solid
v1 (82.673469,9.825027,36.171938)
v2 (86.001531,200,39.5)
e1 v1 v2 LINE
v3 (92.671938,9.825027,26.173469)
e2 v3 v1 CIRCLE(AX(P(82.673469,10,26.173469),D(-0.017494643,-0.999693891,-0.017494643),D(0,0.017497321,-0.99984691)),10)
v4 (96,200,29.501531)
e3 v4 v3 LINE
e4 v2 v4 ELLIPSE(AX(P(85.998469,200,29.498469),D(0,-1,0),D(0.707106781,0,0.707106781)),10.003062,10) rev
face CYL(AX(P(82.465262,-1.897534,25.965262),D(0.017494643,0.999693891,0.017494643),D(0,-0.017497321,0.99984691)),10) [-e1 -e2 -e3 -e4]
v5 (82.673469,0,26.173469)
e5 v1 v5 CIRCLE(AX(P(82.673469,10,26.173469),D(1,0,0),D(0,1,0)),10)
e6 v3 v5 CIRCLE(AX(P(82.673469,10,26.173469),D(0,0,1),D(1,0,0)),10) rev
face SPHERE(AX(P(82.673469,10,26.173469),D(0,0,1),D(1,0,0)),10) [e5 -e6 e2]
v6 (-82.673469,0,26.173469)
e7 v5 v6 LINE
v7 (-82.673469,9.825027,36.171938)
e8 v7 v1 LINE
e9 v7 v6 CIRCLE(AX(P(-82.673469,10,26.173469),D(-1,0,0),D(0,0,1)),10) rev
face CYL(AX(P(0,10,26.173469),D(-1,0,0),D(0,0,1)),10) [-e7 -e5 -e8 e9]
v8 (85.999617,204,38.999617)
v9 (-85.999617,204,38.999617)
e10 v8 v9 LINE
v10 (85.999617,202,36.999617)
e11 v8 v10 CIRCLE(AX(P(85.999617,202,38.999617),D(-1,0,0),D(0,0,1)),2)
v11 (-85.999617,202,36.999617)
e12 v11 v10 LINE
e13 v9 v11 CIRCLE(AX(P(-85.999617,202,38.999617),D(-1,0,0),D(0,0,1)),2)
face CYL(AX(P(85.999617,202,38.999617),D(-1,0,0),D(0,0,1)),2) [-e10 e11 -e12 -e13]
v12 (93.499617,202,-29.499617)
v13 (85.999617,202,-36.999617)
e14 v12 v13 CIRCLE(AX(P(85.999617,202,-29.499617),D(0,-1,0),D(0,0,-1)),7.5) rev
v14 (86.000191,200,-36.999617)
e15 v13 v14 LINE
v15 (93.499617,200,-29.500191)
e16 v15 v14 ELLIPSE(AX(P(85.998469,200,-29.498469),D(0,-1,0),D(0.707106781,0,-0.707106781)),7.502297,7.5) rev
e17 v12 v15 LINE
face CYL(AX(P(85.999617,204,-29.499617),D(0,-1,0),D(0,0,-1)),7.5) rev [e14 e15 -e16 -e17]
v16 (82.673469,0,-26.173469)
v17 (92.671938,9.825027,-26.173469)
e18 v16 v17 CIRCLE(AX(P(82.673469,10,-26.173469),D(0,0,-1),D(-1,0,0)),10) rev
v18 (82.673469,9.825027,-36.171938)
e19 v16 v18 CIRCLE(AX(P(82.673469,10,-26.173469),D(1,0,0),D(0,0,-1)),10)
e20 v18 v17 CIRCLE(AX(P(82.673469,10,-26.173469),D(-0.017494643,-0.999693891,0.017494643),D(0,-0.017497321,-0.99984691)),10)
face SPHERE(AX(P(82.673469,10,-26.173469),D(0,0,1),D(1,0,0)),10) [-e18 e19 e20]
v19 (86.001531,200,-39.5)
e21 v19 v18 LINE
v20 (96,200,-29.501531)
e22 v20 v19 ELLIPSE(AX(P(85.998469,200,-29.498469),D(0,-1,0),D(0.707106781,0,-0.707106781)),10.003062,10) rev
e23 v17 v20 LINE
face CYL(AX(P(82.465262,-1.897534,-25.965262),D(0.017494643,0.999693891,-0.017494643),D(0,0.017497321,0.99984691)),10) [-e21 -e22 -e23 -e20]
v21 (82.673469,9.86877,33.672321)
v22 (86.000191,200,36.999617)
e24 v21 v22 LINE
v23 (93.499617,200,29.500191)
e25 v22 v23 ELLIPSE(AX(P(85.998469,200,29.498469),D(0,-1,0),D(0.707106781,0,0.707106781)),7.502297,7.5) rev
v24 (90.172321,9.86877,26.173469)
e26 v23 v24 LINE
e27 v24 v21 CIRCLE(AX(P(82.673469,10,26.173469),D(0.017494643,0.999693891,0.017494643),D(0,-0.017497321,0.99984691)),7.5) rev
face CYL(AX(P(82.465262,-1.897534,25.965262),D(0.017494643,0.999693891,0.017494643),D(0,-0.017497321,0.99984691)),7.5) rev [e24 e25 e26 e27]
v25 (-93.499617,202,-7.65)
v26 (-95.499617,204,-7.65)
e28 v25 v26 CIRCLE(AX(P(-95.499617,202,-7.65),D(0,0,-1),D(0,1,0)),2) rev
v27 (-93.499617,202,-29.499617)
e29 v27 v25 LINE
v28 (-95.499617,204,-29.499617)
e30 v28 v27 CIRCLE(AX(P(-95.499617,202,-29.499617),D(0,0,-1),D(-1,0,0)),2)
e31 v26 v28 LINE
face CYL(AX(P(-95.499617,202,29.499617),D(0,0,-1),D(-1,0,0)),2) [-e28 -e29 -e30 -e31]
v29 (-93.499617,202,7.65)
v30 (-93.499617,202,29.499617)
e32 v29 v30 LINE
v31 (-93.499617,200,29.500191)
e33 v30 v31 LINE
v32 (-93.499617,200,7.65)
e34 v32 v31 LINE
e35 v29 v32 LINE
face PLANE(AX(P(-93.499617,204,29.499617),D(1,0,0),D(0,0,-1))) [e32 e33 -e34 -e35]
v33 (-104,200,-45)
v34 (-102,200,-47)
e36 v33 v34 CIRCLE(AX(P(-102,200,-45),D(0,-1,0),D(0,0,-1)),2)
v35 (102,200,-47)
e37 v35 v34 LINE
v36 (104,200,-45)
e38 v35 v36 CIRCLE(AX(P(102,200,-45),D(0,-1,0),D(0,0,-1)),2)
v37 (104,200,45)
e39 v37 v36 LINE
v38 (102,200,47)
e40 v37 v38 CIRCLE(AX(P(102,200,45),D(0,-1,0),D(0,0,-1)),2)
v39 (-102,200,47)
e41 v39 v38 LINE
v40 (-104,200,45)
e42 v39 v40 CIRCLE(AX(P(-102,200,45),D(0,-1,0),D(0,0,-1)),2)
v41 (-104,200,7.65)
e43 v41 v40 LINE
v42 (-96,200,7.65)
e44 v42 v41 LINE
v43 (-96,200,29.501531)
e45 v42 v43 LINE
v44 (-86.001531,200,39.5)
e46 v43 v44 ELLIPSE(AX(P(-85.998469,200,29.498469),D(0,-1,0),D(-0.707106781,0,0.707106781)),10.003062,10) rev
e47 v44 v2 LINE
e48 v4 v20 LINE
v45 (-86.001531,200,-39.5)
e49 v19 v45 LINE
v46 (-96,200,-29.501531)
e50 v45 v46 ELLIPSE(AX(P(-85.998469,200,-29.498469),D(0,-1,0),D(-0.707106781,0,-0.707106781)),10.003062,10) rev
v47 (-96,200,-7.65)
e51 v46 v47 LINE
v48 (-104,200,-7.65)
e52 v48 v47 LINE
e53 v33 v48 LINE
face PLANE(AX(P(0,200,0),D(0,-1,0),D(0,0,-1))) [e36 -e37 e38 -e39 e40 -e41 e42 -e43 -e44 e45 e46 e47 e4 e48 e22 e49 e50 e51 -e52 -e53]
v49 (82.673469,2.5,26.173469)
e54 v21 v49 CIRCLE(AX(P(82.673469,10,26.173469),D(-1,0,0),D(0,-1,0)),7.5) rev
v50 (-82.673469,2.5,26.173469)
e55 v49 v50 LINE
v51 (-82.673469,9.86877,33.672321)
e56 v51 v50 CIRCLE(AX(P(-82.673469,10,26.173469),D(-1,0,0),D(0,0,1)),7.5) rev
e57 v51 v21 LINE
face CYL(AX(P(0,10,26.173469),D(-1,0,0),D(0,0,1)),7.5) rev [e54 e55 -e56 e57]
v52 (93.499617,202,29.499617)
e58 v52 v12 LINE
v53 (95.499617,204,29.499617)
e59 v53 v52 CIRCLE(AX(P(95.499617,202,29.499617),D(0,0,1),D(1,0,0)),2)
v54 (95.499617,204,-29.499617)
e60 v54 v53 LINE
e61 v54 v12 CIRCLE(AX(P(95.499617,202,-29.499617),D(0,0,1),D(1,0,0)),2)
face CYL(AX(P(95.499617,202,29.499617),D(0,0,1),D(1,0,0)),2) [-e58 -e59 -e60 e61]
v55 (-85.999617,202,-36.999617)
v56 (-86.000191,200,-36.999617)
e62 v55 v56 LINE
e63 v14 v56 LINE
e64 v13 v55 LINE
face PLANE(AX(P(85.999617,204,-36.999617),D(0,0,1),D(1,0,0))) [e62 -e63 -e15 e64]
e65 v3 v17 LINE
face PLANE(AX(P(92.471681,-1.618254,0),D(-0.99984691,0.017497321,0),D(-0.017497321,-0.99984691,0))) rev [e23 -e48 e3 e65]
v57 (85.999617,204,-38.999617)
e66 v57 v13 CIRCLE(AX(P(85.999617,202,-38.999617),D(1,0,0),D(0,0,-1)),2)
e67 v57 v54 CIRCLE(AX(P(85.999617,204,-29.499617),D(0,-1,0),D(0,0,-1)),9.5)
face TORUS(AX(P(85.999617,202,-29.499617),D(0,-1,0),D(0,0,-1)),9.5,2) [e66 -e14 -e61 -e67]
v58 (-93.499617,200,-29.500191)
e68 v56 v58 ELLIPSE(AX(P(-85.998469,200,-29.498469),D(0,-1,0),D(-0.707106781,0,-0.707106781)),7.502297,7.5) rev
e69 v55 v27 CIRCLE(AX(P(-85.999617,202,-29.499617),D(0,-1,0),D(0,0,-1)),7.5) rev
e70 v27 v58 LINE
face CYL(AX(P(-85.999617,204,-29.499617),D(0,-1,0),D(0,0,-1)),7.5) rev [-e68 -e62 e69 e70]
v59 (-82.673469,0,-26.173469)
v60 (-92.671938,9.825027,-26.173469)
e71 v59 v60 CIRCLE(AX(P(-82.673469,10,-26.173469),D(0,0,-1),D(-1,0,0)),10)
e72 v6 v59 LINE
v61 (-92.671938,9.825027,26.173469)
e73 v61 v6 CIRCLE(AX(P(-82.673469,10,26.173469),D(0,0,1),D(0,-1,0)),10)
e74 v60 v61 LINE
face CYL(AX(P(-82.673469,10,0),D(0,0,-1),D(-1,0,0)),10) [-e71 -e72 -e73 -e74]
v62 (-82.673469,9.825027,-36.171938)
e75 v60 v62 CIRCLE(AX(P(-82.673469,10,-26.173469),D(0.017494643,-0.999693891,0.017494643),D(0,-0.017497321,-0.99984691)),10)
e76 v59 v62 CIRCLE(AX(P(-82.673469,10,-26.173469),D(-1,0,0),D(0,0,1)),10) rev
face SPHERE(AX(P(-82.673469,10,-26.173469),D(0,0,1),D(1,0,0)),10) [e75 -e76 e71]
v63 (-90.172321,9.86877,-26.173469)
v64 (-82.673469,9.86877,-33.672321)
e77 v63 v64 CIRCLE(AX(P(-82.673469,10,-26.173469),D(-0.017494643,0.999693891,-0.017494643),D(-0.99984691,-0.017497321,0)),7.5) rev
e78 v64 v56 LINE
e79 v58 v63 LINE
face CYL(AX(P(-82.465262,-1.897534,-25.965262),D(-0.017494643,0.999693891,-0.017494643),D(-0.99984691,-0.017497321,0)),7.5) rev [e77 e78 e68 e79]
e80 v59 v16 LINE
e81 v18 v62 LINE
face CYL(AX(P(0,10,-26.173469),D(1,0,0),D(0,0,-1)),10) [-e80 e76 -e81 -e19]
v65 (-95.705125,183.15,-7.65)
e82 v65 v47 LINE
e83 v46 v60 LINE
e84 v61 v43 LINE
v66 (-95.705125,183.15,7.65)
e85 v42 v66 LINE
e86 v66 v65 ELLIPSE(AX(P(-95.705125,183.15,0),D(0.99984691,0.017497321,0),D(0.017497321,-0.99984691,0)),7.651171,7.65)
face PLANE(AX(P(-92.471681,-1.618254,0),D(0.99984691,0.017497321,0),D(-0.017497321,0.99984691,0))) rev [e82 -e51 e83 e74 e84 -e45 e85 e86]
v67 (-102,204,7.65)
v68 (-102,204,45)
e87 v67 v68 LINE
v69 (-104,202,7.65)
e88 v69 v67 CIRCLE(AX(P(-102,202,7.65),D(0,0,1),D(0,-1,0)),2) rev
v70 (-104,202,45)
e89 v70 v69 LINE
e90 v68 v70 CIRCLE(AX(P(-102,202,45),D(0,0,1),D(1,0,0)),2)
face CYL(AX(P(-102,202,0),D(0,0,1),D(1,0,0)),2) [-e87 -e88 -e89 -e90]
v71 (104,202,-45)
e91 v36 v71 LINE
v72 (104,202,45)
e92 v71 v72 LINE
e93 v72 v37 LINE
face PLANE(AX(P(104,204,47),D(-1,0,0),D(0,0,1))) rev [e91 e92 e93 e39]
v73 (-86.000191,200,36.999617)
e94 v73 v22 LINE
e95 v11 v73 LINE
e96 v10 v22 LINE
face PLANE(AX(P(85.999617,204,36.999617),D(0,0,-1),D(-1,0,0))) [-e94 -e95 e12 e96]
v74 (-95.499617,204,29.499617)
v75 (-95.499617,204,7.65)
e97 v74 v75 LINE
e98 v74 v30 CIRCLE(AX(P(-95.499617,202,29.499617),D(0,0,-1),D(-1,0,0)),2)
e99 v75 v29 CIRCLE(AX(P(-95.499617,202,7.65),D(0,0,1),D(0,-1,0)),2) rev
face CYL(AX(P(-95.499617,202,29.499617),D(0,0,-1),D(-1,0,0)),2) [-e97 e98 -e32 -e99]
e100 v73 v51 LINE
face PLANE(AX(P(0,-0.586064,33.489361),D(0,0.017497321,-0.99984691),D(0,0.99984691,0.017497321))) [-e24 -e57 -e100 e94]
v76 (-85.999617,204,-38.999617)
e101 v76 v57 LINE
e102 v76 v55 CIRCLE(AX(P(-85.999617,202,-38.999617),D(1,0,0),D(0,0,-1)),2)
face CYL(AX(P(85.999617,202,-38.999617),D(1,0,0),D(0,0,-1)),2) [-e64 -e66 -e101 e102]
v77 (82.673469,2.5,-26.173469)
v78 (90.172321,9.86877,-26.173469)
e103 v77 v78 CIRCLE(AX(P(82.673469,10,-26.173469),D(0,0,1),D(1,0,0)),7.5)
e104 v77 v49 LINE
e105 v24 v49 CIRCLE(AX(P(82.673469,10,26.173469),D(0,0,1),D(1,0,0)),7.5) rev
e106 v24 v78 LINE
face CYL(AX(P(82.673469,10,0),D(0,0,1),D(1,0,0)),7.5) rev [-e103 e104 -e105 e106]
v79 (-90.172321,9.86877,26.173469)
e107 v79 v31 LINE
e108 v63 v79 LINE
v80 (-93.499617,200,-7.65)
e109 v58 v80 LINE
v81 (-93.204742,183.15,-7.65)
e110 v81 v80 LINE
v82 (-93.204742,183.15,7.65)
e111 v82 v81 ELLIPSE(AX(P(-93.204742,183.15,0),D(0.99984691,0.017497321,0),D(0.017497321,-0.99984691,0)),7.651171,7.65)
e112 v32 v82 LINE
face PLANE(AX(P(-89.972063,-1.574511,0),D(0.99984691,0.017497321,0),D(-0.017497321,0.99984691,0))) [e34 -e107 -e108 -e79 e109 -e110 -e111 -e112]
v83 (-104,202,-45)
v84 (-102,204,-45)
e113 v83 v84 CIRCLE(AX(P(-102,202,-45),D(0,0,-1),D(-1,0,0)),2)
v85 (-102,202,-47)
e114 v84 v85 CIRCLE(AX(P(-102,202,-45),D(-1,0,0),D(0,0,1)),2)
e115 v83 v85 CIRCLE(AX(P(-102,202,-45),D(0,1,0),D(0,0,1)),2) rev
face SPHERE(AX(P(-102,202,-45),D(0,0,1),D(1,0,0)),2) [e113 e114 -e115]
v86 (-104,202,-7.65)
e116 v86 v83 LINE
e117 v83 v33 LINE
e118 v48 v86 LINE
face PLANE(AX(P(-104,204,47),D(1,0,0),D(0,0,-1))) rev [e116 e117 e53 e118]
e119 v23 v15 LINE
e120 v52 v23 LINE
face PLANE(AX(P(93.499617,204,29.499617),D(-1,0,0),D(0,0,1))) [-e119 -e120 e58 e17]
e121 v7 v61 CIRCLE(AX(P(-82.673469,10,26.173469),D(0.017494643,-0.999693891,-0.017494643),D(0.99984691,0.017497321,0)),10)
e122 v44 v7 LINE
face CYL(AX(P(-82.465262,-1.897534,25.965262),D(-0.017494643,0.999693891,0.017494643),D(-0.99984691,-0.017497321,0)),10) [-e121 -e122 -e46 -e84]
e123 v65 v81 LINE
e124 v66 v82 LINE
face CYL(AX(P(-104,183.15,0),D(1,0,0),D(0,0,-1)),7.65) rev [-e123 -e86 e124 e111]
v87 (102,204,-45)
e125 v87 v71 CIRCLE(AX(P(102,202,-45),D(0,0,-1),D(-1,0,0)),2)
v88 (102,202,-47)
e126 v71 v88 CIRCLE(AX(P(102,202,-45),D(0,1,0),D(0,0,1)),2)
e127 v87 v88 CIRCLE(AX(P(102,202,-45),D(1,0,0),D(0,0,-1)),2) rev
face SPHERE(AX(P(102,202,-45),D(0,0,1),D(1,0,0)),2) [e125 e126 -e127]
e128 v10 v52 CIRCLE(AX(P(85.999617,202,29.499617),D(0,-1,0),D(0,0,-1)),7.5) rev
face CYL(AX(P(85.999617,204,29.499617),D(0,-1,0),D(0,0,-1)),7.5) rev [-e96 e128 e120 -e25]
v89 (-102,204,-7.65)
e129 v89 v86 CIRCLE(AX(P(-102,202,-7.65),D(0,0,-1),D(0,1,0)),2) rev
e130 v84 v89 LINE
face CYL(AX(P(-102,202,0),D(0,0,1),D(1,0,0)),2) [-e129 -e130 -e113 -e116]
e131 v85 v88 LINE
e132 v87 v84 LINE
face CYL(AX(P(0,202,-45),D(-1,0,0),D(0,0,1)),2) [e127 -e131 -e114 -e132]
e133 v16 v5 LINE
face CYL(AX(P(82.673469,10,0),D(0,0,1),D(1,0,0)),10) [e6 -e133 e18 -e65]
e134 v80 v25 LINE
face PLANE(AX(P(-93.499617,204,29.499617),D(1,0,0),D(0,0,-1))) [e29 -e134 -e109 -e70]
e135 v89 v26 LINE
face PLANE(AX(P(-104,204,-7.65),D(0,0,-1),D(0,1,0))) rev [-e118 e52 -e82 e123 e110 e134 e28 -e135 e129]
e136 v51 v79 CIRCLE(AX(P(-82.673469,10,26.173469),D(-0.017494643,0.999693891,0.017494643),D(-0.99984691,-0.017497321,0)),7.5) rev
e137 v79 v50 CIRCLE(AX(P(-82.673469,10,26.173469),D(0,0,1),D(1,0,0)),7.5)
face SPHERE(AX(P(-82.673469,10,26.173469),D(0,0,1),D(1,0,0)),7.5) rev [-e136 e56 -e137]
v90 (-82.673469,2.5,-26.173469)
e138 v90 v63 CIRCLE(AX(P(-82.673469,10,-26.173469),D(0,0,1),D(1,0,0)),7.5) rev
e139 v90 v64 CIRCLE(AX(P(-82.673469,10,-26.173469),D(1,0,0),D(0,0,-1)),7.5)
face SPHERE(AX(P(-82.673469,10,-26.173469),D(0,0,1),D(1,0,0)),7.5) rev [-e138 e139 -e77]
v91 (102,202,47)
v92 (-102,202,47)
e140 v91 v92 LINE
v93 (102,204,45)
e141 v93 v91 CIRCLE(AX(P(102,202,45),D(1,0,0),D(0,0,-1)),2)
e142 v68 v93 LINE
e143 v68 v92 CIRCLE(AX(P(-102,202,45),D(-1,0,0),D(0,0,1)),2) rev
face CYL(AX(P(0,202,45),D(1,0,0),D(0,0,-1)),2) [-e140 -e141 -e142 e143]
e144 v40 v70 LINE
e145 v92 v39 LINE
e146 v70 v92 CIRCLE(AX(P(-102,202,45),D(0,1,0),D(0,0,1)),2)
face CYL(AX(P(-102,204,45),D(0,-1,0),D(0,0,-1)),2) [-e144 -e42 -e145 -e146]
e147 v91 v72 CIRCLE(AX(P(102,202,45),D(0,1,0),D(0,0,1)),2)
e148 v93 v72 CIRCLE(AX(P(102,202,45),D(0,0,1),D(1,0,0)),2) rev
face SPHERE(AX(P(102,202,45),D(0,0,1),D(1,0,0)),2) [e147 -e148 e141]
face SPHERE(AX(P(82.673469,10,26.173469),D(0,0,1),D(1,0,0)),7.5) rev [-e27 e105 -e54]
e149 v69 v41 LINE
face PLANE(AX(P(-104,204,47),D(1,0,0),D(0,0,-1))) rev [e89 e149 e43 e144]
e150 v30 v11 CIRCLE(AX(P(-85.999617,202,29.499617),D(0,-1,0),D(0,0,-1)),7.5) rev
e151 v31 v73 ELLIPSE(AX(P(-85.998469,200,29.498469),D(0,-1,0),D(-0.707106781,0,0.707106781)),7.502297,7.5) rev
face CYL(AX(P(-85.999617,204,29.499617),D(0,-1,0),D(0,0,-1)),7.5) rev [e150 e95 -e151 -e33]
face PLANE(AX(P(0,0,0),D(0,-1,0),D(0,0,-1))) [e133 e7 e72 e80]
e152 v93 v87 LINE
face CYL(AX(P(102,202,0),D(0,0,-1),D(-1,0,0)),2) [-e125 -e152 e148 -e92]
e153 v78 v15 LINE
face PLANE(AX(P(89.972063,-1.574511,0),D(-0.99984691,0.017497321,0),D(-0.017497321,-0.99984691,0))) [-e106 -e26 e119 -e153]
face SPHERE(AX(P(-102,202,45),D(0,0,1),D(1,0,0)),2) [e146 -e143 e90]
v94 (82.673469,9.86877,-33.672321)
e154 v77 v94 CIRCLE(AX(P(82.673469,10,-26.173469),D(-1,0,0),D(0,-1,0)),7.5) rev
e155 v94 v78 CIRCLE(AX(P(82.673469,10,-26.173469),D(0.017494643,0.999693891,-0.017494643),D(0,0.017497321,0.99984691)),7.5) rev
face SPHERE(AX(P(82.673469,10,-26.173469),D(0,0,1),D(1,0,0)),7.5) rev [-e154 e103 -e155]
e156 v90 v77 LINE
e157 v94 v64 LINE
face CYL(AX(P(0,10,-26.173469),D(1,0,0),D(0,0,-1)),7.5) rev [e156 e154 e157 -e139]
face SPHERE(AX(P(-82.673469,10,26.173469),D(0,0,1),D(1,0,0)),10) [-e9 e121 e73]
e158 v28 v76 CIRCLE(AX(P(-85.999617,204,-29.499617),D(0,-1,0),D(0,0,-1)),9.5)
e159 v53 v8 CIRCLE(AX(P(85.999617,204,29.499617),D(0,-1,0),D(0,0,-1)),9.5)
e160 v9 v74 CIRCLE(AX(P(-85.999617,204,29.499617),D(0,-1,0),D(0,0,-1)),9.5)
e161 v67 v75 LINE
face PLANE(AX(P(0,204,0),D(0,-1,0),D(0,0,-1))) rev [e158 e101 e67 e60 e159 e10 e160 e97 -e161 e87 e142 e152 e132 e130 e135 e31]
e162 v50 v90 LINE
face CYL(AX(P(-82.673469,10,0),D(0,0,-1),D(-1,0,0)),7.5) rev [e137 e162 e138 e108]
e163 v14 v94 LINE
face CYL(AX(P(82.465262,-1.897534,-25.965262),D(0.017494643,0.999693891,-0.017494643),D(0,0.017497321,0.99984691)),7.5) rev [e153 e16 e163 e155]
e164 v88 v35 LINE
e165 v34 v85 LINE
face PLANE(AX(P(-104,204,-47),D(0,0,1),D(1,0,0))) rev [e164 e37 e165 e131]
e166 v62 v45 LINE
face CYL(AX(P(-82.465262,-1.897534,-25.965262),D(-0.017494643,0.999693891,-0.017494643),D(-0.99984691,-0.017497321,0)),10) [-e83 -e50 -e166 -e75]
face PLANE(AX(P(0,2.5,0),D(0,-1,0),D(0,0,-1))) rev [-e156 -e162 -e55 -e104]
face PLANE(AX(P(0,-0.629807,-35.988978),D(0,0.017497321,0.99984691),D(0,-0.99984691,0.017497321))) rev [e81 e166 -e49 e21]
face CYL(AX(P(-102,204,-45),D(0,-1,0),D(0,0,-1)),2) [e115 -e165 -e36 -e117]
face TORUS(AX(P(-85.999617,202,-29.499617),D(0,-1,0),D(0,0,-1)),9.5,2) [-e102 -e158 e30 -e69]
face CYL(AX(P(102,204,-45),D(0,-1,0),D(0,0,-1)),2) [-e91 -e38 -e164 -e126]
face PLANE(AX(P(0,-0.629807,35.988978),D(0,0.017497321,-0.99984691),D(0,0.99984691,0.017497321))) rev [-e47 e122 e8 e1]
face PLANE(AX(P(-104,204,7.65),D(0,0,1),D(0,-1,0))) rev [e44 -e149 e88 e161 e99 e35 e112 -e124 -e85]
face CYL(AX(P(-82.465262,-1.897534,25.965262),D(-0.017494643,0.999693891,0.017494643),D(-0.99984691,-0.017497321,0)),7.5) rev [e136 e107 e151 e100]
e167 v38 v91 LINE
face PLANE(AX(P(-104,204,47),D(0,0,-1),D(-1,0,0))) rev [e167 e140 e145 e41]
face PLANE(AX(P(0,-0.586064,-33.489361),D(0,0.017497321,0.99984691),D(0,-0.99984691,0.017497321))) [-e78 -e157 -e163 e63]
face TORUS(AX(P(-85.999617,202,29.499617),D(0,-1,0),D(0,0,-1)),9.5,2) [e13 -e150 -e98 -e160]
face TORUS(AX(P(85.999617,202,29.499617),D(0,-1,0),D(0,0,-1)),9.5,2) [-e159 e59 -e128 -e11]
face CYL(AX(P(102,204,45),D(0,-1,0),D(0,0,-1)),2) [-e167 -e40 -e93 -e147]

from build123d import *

# Parameters (mm, degrees)
LOFT2_OUTLINE_W     = 185
LOFT2_OUTLINE_H     = 72
LOFT2_DEPTH         = 200
LOFT2_DRAFT         = -1.0025738
FILLET1_R           = 10
SHELL1_T            = -2.5
SKETCH5_W           = 208
SKETCH5_H           = 94
BOSS_EXTRUDE2_DEPTH = 4
CUT_EXTRUDE1_DEPTH  = 231.271578793
CUT_EXTRUDE2_DEPTH  = 234.754144348
FILLET2_R           = 2


# Read off the part's stored shape, not the designer's step: Loft2
with BuildPart() as part:
    # Loft2 outline → Loft2 (with draft: the straight prism first)
    with BuildSketch(Plane(origin=(0, 0, 0), x_dir=(1, 0, 0), z_dir=(0, 1, 0))):
        Rectangle(LOFT2_OUTLINE_W, LOFT2_OUTLINE_H)
    extrude(amount=LOFT2_DEPTH)
    # Loft2: the draft: its side faces are tilted about the plane it starts from
    loft2_sides = [part.faces().sort_by_distance(p)[0] for p in [
        (0, 100, -36),
        (-92.5, 100, 0),
        (0, 100, 36),
        (92.5, 100, 0),
    ]]
    draft(loft2_sides, Plane(origin=(0, 0, 0), x_dir=(1, 0, 0), z_dir=(0, 1, 0)), LOFT2_DRAFT)

    # Fillet1
    fillet1_edges = [part.edges().sort_by_distance(p)[0] for p in [
        (92.5, 0, 0),
        (0, 0, -36),
        (-92.5, 0, 0),
        (0, 0, 36),
        (-94.249999993, 100, -37.749999993),
        (94.249999993, 100, -37.749999993),
        (-94.249999993, 100, 37.749999993),
        (94.249999993, 100, 37.749999993),
    ]]
    fillet(fillet1_edges, radius=FILLET1_R)

    # Shell1
    shell1_openings = [part.faces().sort_by_distance(p)[0] for p in [
        (0, 200, 0),
    ]]
    offset(amount=SHELL1_T, openings=shell1_openings, kind=Kind.INTERSECTION)

    # Sketch5 → Boss-Extrude2 (add)
    with BuildSketch(Plane(origin=(0, 200, 0), x_dir=(1, 0, 0), z_dir=(0, 1, 0))):
        Rectangle(SKETCH5_W, SKETCH5_H)
    extrude(amount=BOSS_EXTRUDE2_DEPTH)

    # Sketch6 → Cut-Extrude1 (cut, through all)
    with BuildSketch(Plane(origin=(0, 200, 0), x_dir=(1, 0, 0), z_dir=(0, 1, 0))):
        with BuildLine():
            Line((85.999617217, -36.999617217), (-85.999617217, -36.999617217))
            ThreePointArc((-85.999617217, -36.999617217), (-91.302918076, -34.802918076), (-93.499617217, -29.499617217))
            Line((-93.499617217, -29.499617217), (-93.499617217, 29.499617217))
            ThreePointArc((-93.499617217, 29.499617217), (-91.302918076, 34.802918076), (-85.999617217, 36.999617217))
            Line((-85.999617217, 36.999617217), (85.999617217, 36.999617217))
            ThreePointArc((85.999617217, 36.999617217), (91.302918076, 34.802918076), (93.499617217, 29.499617217))
            Line((93.499617217, 29.499617217), (93.499617217, -29.499617217))
            ThreePointArc((93.499617217, -29.499617217), (91.302918076, -34.802918076), (85.999617217, -36.999617217))
        make_face()
    extrude(amount=CUT_EXTRUDE1_DEPTH, mode=Mode.SUBTRACT)

    # Sketch3 → Cut-Extrude2 (cut, through all)
    with BuildSketch(Plane(origin=(0, 0, 0), x_dir=(0, 0, -1), z_dir=(1, 0, 0))):
        with BuildLine():
            Line((-7.65, 204), (-7.65, 183.15))
            ThreePointArc((-7.65, 183.15), (0, 175.5), (7.65, 183.15))
            Line((7.65, 183.15), (7.65, 204))
            Line((7.65, 204), (-7.65, 204))
        make_face()
    extrude(amount=-CUT_EXTRUDE2_DEPTH, mode=Mode.SUBTRACT)

    # Fillet2
    fillet2_edges = [part.edges().sort_by_distance(p)[0] for p in [
        (-93.499617217, 204, 18.574808608),
        (-91.302918076, 204, 34.802918076),
        (0, 204, 36.999617217),
        (91.302918076, 204, 34.802918076),
        (93.499617217, 204, 0),
        (91.302918076, 204, -34.802918076),
        (0, 204, -36.999617217),
        (-91.302918076, 204, -34.802918076),
        (-104, 204, -27.325),
        (0, 204, -47),
        (104, 204, 0),
        (-104, 204, 27.325),
        (0, 204, 47),
        (-93.499617217, 204, -18.574808608),
        (-104, 202, -47),
        (-104, 202, 47),
        (104, 202, -47),
        (104, 202, 47),
    ]]
    fillet(fillet2_edges, radius=FILLET2_R)


solid = part.part
